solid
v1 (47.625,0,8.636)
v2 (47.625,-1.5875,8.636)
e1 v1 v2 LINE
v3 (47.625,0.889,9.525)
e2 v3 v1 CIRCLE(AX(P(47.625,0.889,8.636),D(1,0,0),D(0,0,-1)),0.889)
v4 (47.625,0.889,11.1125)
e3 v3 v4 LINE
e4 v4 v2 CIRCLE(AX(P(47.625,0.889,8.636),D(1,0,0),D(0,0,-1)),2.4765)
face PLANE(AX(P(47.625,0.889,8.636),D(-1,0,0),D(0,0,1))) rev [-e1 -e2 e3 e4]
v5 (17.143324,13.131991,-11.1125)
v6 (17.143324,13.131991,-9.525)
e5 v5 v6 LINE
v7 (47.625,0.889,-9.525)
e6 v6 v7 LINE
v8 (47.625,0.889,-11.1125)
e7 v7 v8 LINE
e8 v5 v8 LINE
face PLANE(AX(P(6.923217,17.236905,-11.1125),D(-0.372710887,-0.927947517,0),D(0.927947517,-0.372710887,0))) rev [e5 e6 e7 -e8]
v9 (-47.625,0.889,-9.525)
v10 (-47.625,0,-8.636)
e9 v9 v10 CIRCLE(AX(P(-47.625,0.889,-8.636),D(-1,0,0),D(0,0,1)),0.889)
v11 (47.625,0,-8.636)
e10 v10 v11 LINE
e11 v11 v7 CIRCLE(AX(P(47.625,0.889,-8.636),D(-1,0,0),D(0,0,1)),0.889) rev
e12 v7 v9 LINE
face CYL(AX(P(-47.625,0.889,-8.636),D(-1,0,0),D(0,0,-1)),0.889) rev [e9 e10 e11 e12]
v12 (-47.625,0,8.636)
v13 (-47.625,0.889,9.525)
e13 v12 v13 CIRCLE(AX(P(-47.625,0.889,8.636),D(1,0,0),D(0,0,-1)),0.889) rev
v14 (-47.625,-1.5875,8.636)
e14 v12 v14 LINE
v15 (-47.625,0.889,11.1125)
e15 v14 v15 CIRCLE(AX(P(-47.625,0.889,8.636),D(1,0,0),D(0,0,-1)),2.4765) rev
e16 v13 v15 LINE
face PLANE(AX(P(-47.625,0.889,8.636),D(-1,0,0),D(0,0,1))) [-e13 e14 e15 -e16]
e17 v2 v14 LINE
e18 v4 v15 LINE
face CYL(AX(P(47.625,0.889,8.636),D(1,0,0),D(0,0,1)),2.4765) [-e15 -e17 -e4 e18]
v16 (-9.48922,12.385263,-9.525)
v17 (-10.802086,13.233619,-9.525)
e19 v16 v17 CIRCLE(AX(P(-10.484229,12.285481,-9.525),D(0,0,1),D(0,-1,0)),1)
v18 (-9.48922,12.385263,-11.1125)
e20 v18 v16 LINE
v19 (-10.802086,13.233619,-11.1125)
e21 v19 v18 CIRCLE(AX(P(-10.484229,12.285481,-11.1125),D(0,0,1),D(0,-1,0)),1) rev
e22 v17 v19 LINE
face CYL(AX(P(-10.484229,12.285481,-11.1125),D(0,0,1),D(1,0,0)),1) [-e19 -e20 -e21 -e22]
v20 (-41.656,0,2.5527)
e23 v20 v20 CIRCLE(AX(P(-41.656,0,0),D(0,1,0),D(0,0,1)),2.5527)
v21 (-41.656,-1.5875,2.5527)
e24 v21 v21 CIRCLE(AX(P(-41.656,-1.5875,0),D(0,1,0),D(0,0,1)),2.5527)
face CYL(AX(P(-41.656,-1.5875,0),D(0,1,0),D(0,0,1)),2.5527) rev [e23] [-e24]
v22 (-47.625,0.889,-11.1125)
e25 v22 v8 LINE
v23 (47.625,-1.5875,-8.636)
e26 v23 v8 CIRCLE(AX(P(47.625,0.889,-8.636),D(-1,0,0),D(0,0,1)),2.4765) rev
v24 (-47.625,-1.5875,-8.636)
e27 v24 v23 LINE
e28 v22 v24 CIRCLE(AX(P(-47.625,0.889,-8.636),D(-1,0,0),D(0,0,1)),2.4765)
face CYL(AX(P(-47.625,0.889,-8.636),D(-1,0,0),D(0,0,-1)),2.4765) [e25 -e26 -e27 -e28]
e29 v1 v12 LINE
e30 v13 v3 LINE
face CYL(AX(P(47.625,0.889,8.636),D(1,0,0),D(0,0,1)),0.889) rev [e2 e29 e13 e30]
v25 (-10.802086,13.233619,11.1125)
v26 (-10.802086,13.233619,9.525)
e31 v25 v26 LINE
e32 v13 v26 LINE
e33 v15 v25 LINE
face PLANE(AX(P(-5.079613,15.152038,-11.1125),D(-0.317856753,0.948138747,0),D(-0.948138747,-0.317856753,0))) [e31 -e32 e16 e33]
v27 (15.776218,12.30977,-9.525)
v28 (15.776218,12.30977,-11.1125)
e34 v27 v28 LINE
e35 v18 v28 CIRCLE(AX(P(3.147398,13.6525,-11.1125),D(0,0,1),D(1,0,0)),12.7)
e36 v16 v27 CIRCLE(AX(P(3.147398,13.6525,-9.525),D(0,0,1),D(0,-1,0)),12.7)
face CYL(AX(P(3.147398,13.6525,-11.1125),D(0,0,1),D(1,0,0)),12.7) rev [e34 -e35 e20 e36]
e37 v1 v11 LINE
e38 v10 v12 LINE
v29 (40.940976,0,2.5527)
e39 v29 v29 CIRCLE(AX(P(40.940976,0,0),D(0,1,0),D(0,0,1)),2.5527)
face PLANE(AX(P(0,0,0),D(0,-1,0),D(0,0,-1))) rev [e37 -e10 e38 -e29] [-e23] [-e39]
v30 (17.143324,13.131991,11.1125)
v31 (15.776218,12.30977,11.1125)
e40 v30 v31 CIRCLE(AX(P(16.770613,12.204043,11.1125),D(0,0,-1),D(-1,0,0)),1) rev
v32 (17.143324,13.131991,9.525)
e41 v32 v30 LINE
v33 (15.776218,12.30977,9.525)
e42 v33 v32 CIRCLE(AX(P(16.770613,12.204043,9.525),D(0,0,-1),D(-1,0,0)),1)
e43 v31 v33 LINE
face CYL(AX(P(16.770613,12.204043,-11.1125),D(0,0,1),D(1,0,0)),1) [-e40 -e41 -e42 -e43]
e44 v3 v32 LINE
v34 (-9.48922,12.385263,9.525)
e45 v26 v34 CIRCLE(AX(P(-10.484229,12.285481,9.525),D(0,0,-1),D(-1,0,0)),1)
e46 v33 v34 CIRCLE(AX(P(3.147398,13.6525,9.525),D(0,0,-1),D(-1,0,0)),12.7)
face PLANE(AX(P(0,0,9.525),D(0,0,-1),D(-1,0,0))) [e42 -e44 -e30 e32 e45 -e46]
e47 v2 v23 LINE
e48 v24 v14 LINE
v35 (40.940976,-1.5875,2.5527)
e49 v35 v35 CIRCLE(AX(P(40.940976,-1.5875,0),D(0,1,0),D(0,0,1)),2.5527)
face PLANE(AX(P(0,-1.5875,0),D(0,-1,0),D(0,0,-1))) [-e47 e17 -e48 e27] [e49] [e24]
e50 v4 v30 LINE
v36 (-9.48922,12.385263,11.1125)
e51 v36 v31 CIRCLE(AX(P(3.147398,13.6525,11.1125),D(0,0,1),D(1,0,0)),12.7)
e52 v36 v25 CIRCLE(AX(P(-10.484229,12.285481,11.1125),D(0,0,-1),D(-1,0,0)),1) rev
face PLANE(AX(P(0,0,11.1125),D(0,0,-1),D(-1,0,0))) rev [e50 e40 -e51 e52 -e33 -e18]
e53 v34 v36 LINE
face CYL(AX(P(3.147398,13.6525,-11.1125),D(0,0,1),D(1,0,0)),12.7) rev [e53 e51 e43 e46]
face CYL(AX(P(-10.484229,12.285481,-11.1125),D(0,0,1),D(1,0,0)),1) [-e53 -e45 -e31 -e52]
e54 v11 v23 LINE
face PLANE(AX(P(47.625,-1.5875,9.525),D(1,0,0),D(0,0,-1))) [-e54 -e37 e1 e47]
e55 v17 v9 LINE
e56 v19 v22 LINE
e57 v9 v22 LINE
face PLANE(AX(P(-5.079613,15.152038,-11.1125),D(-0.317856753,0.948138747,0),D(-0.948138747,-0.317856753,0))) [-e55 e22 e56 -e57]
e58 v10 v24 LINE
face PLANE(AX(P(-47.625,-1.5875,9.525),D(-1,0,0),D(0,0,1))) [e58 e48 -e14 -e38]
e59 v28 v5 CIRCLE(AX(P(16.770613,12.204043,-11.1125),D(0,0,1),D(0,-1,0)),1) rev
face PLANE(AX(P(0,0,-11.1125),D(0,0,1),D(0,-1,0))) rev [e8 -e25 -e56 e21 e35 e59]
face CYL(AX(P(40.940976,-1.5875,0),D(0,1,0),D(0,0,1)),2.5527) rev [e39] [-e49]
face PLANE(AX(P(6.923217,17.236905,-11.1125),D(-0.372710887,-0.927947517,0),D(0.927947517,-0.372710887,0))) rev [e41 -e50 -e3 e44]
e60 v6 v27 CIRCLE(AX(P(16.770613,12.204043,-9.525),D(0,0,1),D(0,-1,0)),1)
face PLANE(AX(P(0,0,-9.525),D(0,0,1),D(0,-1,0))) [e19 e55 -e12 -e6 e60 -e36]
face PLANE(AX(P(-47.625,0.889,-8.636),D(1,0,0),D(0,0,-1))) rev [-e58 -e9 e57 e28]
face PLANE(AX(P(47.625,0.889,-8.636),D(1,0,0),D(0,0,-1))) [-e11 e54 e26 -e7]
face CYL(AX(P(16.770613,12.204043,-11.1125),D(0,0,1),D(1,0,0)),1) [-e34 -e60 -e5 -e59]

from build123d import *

# Parameters (mm, degrees)
SKETCH1_W                      = 95.25
SKETCH1_H                      = 19.05
BASE_FLANGE1_DEPTH             = 1.5875
EDGE_FLANGE1_STRIP_W           = 8.128
EDGE_FLANGE1_STRIP_H           = 1.5875
EDGE_FLANGE1_STRIP_CUT_DEPTH   = 95.25
EDGE_FLANGE1_STRIP_2_W         = 8.128
EDGE_FLANGE1_STRIP_2_H         = 1.5875
EDGE_FLANGE1_STRIP_CUT_2_DEPTH = 95.25
EDGE_FLANGE1_DEPTH             = 95.25
EDGE_FLANGE1_BEND_DEPTH        = 95.25
CUT_EXTRUDE1_DEPTH             = 55.299926393
CUT_EXTRUDE1_DEPTH_BACK        = 55.299926393
HOLE1_START                    = -1.5875
HOLE1_OUTLINE_R                = 2.5527
HOLE1_DEPTH                    = 1.5875
FILLET1_R                      = 1


# Read off the part's stored shape, not the designer's step: Hole1
# Sheet-metal steps are written as plain solids
with BuildPart() as part:
    # Sketch1 → Base-Flange1 (new body)
    with BuildSketch(Plane(origin=(0, 0, 0), x_dir=(1, 0, 0), z_dir=(0, 1, 0))):
        Rectangle(SKETCH1_W, SKETCH1_H)
    extrude(amount=-BASE_FLANGE1_DEPTH)

    # Edge-Flange1 strip (across the edge) → Edge-Flange1 strip cut (cut)
    with BuildSketch(Plane(origin=(-47.625, 0, 9.525), x_dir=(0, 0, -1), z_dir=(1, 0, 0))):
        with Locations((-3.175, -0.79375)):
            Rectangle(EDGE_FLANGE1_STRIP_W, EDGE_FLANGE1_STRIP_H)
    extrude(amount=EDGE_FLANGE1_STRIP_CUT_DEPTH, mode=Mode.SUBTRACT)

    # Edge-Flange1 strip 2 (across the edge) → Edge-Flange1 strip cut 2 (cut)
    with BuildSketch(Plane(origin=(47.625, 0, -9.525), x_dir=(0, 0, 1), z_dir=(-1, 0, 0))):
        with Locations((-3.175, -0.79375)):
            Rectangle(EDGE_FLANGE1_STRIP_2_W, EDGE_FLANGE1_STRIP_2_H)
    extrude(amount=EDGE_FLANGE1_STRIP_CUT_2_DEPTH, mode=Mode.SUBTRACT)

    # Edge-Flange1 section (across the edge) → Edge-Flange1 (add)
    with BuildSketch(Plane(origin=(-47.625, 0, 9.525), x_dir=(0, 0, -1), z_dir=(1, 0, 0))):
        with BuildLine():
            Line((-1.5875, 0.889), (-1.5875, 13.6525))
            Line((-1.5875, 13.6525), (0, 13.6525))
            Line((0, 13.6525), (0, 0.889))
            ThreePointArc((0, 0.889), (0.260382072, 0.260382072), (0.889, 0))
            Line((0.889, 0), (0.889, -1.5875))
            ThreePointArc((0.889, -1.5875), (-0.862149944, -0.862149944), (-1.5875, 0.889))
        make_face()
    extrude(amount=EDGE_FLANGE1_DEPTH)

    # Edge-Flange1 section 2 (across the edge) → Edge-Flange1 bend (add)
    with BuildSketch(Plane(origin=(47.625, 0, -9.525), x_dir=(0, 0, 1), z_dir=(-1, 0, 0))):
        with BuildLine():
            Line((-1.5875, 0.889), (-1.5875, 13.6525))
            Line((-1.5875, 13.6525), (0, 13.6525))
            Line((0, 13.6525), (0, 0.889))
            ThreePointArc((0, 0.889), (0.260382072, 0.260382072), (0.889, 0))
            Line((0.889, 0), (0.889, -1.5875))
            ThreePointArc((0.889, -1.5875), (-0.862149944, -0.862149944), (-1.5875, 0.889))
        make_face()
    extrude(amount=EDGE_FLANGE1_BEND_DEPTH)

    # Sketch12 → Cut-Extrude1 (cut, two sides: drawn at the far end of the back side and taken through both)
    with BuildSketch(Plane.XY.offset(11.1125).offset(-CUT_EXTRUDE1_DEPTH_BACK)):
        with BuildLine():
            Line((15.847398271, 13.6525), (-9.552601729, 13.6525))
            ThreePointArc((-9.552601729, 13.6525), (3.147398271, 0.9525), (15.847398271, 13.6525))
        make_face()
        Polygon((-47.625, 0.889), (-9.552601729, 13.6525), (-47.625, 13.6525), align=None)
        Polygon((47.625, 13.6525), (15.847398271, 13.6525), (47.625, 0.889), align=None)
    extrude(amount=CUT_EXTRUDE1_DEPTH + CUT_EXTRUDE1_DEPTH_BACK, mode=Mode.SUBTRACT)

    # Hole1 outline → Hole1 (cut)
    with BuildSketch(Plane(origin=(0, 0, 0), x_dir=(1, 0, 0), z_dir=(0, 1, 0)).offset(HOLE1_START)):
        with Locations((40.940976195, 0)):
            Circle(HOLE1_OUTLINE_R)
        with Locations((-41.656, 0)):
            Circle(HOLE1_OUTLINE_R)
    extrude(amount=HOLE1_DEPTH, mode=Mode.SUBTRACT)

    # Fillet1
    fillet1_edges = [part.edges().sort_by_distance(p)[0] for p in [
        (-9.552601729, 13.6525, -10.31875),
        (15.847398271, 13.6525, 10.31875),
        (15.847398271, 13.6525, -10.31875),
        (-9.552601729, 13.6525, 10.31875),
    ]]
    fillet(fillet1_edges, radius=FILLET1_R)


solid = part.part
